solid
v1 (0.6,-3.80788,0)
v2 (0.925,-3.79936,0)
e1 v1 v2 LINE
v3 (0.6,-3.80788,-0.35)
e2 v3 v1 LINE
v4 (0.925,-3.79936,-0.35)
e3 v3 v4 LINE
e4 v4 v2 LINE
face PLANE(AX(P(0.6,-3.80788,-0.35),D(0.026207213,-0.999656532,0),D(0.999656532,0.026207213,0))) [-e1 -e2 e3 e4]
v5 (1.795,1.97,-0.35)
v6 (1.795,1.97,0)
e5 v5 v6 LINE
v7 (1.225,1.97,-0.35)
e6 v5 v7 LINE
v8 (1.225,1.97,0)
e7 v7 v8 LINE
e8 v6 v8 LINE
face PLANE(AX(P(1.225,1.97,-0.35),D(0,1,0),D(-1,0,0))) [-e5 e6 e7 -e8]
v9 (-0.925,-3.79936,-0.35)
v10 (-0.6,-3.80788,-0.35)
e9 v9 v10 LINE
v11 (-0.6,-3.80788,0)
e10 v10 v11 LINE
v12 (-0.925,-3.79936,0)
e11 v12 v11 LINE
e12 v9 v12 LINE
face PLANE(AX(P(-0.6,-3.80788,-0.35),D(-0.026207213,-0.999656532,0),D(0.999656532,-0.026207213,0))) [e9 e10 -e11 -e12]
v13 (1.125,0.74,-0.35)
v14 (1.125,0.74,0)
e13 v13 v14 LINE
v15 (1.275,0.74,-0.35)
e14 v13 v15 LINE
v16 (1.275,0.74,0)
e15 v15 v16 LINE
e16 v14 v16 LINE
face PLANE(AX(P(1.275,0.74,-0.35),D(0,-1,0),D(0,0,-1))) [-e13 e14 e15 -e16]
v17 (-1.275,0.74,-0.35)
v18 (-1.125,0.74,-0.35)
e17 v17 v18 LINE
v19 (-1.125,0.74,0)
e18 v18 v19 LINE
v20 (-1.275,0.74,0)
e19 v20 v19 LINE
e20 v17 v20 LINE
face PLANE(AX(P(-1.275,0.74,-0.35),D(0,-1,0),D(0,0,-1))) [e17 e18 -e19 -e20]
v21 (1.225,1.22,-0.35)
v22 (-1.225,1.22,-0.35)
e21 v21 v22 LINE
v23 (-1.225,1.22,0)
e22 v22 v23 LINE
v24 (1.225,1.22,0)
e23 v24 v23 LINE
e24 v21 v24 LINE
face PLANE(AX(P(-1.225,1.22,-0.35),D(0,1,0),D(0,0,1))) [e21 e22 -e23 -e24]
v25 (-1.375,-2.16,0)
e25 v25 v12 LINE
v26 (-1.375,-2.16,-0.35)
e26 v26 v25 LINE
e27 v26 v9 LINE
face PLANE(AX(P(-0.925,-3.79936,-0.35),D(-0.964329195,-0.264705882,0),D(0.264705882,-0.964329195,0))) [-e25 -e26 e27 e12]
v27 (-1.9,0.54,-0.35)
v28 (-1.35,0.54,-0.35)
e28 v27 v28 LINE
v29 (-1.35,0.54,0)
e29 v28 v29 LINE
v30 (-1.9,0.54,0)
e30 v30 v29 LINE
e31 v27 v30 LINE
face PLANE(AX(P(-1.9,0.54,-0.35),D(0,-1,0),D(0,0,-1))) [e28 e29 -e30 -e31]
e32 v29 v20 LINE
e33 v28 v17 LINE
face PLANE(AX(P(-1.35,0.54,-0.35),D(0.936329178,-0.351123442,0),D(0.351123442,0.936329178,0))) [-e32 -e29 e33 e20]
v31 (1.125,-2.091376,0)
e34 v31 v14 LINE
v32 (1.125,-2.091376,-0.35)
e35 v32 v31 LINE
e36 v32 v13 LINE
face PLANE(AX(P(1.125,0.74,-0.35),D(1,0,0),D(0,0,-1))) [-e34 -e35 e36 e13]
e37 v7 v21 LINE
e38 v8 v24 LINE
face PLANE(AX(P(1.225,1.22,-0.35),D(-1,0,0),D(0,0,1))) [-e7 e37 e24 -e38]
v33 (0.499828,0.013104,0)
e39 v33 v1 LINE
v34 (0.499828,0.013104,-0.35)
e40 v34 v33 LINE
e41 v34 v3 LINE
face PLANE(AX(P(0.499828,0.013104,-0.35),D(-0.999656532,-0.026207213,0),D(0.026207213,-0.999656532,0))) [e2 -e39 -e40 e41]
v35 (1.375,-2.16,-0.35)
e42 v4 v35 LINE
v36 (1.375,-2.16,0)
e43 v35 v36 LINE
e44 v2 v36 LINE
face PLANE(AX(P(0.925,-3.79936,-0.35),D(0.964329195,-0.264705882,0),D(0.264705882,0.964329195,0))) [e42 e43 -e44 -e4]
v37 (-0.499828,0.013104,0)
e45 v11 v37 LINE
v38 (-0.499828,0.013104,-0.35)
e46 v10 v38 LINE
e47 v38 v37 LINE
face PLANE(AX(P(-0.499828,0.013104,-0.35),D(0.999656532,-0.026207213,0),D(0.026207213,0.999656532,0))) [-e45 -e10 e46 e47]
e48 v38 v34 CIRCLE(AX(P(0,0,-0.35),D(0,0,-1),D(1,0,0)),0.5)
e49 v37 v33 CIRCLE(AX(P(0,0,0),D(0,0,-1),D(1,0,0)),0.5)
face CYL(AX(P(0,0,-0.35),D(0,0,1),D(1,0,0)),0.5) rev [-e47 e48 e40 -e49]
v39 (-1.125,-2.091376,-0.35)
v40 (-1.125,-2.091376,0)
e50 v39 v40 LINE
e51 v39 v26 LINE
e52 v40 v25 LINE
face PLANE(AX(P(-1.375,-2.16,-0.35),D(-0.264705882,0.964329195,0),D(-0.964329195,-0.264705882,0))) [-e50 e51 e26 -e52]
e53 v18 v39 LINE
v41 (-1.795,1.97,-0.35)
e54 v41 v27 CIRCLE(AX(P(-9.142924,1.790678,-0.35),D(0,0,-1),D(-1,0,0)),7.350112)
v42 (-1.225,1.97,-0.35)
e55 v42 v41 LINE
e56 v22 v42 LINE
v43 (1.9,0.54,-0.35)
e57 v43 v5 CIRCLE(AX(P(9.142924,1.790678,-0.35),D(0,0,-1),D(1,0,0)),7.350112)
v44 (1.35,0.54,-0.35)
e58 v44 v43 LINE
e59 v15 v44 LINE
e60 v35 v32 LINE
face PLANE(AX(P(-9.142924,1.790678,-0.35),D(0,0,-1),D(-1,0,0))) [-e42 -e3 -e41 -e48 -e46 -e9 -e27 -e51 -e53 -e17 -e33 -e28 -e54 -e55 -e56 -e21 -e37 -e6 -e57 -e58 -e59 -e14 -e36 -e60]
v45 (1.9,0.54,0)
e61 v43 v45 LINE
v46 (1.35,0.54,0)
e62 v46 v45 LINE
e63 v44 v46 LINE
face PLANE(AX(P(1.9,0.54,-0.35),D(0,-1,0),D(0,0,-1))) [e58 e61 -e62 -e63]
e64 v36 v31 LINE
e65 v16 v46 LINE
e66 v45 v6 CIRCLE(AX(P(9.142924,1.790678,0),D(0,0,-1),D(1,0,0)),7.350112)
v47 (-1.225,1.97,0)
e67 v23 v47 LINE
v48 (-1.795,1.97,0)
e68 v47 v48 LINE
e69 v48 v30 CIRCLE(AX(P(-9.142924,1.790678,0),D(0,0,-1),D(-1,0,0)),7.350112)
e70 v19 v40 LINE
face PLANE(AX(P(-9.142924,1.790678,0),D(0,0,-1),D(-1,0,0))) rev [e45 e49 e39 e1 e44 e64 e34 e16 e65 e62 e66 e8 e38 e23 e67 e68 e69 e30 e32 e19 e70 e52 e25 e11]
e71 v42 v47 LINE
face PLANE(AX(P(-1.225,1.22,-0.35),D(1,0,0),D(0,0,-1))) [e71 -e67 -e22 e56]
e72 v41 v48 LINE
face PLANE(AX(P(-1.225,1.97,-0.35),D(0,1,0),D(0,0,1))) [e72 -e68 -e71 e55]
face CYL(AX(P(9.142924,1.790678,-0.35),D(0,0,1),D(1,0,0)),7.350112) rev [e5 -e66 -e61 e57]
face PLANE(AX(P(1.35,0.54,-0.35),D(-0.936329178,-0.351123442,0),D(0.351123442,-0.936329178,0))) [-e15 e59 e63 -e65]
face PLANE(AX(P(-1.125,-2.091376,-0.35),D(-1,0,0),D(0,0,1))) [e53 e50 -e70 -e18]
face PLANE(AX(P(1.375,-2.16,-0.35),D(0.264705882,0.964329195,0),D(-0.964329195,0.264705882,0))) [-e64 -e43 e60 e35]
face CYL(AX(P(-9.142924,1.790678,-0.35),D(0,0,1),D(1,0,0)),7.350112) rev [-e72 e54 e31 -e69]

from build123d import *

# Parameters (mm, degrees)
BASE_FLANGE1_DEPTH = 0.35


# Sheet-metal steps are written as plain solids
with BuildPart() as part:
    # Sketch1 → Base-Flange1 (new body)
    with BuildSketch(Plane.XY):
        with BuildLine():
            Line((-0.499828266, 0.013103606), (-0.6, -3.807879902))
            Line((-0.6, -3.807879902), (-0.925, -3.799359631))
            Line((-0.925, -3.799359631), (-1.375, -2.16))
            Line((-1.375, -2.16), (-1.125, -2.091375643))
            Line((-1.125, -2.091375643), (-1.125, 0.74))
            Line((-1.125, 0.74), (-1.275, 0.74))
            Line((-1.275, 0.74), (-1.35, 0.54))
            Line((-1.35, 0.54), (-1.9, 0.54))
            ThreePointArc((-1.9, 0.54), (-1.812546359, 1.252433474), (-1.795, 1.97))
            Line((-1.795, 1.97), (-1.225, 1.97))
            Line((-1.225, 1.97), (-1.225, 1.22))
            Line((-1.225, 1.22), (1.225, 1.22))
            Line((1.225, 1.22), (1.225, 1.97))
            Line((1.225, 1.97), (1.795, 1.97))
            ThreePointArc((1.795, 1.97), (1.812546359, 1.252433474), (1.9, 0.54))
            Line((1.9, 0.54), (1.35, 0.54))
            Line((1.35, 0.54), (1.275, 0.74))
            Line((1.275, 0.74), (1.125, 0.74))
            Line((1.125, 0.74), (1.125, -2.091375643))
            Line((1.125, -2.091375643), (1.375, -2.16))
            Line((1.375, -2.16), (0.925, -3.799359631))
            Line((0.925, -3.799359631), (0.6, -3.807879902))
            Line((0.6, -3.807879902), (0.499828266, 0.013103606))
            ThreePointArc((0.499828266, 0.013103606), (0, 0.5), (-0.499828266, 0.013103606))
        make_face()
    extrude(amount=-BASE_FLANGE1_DEPTH)


solid = part.part
